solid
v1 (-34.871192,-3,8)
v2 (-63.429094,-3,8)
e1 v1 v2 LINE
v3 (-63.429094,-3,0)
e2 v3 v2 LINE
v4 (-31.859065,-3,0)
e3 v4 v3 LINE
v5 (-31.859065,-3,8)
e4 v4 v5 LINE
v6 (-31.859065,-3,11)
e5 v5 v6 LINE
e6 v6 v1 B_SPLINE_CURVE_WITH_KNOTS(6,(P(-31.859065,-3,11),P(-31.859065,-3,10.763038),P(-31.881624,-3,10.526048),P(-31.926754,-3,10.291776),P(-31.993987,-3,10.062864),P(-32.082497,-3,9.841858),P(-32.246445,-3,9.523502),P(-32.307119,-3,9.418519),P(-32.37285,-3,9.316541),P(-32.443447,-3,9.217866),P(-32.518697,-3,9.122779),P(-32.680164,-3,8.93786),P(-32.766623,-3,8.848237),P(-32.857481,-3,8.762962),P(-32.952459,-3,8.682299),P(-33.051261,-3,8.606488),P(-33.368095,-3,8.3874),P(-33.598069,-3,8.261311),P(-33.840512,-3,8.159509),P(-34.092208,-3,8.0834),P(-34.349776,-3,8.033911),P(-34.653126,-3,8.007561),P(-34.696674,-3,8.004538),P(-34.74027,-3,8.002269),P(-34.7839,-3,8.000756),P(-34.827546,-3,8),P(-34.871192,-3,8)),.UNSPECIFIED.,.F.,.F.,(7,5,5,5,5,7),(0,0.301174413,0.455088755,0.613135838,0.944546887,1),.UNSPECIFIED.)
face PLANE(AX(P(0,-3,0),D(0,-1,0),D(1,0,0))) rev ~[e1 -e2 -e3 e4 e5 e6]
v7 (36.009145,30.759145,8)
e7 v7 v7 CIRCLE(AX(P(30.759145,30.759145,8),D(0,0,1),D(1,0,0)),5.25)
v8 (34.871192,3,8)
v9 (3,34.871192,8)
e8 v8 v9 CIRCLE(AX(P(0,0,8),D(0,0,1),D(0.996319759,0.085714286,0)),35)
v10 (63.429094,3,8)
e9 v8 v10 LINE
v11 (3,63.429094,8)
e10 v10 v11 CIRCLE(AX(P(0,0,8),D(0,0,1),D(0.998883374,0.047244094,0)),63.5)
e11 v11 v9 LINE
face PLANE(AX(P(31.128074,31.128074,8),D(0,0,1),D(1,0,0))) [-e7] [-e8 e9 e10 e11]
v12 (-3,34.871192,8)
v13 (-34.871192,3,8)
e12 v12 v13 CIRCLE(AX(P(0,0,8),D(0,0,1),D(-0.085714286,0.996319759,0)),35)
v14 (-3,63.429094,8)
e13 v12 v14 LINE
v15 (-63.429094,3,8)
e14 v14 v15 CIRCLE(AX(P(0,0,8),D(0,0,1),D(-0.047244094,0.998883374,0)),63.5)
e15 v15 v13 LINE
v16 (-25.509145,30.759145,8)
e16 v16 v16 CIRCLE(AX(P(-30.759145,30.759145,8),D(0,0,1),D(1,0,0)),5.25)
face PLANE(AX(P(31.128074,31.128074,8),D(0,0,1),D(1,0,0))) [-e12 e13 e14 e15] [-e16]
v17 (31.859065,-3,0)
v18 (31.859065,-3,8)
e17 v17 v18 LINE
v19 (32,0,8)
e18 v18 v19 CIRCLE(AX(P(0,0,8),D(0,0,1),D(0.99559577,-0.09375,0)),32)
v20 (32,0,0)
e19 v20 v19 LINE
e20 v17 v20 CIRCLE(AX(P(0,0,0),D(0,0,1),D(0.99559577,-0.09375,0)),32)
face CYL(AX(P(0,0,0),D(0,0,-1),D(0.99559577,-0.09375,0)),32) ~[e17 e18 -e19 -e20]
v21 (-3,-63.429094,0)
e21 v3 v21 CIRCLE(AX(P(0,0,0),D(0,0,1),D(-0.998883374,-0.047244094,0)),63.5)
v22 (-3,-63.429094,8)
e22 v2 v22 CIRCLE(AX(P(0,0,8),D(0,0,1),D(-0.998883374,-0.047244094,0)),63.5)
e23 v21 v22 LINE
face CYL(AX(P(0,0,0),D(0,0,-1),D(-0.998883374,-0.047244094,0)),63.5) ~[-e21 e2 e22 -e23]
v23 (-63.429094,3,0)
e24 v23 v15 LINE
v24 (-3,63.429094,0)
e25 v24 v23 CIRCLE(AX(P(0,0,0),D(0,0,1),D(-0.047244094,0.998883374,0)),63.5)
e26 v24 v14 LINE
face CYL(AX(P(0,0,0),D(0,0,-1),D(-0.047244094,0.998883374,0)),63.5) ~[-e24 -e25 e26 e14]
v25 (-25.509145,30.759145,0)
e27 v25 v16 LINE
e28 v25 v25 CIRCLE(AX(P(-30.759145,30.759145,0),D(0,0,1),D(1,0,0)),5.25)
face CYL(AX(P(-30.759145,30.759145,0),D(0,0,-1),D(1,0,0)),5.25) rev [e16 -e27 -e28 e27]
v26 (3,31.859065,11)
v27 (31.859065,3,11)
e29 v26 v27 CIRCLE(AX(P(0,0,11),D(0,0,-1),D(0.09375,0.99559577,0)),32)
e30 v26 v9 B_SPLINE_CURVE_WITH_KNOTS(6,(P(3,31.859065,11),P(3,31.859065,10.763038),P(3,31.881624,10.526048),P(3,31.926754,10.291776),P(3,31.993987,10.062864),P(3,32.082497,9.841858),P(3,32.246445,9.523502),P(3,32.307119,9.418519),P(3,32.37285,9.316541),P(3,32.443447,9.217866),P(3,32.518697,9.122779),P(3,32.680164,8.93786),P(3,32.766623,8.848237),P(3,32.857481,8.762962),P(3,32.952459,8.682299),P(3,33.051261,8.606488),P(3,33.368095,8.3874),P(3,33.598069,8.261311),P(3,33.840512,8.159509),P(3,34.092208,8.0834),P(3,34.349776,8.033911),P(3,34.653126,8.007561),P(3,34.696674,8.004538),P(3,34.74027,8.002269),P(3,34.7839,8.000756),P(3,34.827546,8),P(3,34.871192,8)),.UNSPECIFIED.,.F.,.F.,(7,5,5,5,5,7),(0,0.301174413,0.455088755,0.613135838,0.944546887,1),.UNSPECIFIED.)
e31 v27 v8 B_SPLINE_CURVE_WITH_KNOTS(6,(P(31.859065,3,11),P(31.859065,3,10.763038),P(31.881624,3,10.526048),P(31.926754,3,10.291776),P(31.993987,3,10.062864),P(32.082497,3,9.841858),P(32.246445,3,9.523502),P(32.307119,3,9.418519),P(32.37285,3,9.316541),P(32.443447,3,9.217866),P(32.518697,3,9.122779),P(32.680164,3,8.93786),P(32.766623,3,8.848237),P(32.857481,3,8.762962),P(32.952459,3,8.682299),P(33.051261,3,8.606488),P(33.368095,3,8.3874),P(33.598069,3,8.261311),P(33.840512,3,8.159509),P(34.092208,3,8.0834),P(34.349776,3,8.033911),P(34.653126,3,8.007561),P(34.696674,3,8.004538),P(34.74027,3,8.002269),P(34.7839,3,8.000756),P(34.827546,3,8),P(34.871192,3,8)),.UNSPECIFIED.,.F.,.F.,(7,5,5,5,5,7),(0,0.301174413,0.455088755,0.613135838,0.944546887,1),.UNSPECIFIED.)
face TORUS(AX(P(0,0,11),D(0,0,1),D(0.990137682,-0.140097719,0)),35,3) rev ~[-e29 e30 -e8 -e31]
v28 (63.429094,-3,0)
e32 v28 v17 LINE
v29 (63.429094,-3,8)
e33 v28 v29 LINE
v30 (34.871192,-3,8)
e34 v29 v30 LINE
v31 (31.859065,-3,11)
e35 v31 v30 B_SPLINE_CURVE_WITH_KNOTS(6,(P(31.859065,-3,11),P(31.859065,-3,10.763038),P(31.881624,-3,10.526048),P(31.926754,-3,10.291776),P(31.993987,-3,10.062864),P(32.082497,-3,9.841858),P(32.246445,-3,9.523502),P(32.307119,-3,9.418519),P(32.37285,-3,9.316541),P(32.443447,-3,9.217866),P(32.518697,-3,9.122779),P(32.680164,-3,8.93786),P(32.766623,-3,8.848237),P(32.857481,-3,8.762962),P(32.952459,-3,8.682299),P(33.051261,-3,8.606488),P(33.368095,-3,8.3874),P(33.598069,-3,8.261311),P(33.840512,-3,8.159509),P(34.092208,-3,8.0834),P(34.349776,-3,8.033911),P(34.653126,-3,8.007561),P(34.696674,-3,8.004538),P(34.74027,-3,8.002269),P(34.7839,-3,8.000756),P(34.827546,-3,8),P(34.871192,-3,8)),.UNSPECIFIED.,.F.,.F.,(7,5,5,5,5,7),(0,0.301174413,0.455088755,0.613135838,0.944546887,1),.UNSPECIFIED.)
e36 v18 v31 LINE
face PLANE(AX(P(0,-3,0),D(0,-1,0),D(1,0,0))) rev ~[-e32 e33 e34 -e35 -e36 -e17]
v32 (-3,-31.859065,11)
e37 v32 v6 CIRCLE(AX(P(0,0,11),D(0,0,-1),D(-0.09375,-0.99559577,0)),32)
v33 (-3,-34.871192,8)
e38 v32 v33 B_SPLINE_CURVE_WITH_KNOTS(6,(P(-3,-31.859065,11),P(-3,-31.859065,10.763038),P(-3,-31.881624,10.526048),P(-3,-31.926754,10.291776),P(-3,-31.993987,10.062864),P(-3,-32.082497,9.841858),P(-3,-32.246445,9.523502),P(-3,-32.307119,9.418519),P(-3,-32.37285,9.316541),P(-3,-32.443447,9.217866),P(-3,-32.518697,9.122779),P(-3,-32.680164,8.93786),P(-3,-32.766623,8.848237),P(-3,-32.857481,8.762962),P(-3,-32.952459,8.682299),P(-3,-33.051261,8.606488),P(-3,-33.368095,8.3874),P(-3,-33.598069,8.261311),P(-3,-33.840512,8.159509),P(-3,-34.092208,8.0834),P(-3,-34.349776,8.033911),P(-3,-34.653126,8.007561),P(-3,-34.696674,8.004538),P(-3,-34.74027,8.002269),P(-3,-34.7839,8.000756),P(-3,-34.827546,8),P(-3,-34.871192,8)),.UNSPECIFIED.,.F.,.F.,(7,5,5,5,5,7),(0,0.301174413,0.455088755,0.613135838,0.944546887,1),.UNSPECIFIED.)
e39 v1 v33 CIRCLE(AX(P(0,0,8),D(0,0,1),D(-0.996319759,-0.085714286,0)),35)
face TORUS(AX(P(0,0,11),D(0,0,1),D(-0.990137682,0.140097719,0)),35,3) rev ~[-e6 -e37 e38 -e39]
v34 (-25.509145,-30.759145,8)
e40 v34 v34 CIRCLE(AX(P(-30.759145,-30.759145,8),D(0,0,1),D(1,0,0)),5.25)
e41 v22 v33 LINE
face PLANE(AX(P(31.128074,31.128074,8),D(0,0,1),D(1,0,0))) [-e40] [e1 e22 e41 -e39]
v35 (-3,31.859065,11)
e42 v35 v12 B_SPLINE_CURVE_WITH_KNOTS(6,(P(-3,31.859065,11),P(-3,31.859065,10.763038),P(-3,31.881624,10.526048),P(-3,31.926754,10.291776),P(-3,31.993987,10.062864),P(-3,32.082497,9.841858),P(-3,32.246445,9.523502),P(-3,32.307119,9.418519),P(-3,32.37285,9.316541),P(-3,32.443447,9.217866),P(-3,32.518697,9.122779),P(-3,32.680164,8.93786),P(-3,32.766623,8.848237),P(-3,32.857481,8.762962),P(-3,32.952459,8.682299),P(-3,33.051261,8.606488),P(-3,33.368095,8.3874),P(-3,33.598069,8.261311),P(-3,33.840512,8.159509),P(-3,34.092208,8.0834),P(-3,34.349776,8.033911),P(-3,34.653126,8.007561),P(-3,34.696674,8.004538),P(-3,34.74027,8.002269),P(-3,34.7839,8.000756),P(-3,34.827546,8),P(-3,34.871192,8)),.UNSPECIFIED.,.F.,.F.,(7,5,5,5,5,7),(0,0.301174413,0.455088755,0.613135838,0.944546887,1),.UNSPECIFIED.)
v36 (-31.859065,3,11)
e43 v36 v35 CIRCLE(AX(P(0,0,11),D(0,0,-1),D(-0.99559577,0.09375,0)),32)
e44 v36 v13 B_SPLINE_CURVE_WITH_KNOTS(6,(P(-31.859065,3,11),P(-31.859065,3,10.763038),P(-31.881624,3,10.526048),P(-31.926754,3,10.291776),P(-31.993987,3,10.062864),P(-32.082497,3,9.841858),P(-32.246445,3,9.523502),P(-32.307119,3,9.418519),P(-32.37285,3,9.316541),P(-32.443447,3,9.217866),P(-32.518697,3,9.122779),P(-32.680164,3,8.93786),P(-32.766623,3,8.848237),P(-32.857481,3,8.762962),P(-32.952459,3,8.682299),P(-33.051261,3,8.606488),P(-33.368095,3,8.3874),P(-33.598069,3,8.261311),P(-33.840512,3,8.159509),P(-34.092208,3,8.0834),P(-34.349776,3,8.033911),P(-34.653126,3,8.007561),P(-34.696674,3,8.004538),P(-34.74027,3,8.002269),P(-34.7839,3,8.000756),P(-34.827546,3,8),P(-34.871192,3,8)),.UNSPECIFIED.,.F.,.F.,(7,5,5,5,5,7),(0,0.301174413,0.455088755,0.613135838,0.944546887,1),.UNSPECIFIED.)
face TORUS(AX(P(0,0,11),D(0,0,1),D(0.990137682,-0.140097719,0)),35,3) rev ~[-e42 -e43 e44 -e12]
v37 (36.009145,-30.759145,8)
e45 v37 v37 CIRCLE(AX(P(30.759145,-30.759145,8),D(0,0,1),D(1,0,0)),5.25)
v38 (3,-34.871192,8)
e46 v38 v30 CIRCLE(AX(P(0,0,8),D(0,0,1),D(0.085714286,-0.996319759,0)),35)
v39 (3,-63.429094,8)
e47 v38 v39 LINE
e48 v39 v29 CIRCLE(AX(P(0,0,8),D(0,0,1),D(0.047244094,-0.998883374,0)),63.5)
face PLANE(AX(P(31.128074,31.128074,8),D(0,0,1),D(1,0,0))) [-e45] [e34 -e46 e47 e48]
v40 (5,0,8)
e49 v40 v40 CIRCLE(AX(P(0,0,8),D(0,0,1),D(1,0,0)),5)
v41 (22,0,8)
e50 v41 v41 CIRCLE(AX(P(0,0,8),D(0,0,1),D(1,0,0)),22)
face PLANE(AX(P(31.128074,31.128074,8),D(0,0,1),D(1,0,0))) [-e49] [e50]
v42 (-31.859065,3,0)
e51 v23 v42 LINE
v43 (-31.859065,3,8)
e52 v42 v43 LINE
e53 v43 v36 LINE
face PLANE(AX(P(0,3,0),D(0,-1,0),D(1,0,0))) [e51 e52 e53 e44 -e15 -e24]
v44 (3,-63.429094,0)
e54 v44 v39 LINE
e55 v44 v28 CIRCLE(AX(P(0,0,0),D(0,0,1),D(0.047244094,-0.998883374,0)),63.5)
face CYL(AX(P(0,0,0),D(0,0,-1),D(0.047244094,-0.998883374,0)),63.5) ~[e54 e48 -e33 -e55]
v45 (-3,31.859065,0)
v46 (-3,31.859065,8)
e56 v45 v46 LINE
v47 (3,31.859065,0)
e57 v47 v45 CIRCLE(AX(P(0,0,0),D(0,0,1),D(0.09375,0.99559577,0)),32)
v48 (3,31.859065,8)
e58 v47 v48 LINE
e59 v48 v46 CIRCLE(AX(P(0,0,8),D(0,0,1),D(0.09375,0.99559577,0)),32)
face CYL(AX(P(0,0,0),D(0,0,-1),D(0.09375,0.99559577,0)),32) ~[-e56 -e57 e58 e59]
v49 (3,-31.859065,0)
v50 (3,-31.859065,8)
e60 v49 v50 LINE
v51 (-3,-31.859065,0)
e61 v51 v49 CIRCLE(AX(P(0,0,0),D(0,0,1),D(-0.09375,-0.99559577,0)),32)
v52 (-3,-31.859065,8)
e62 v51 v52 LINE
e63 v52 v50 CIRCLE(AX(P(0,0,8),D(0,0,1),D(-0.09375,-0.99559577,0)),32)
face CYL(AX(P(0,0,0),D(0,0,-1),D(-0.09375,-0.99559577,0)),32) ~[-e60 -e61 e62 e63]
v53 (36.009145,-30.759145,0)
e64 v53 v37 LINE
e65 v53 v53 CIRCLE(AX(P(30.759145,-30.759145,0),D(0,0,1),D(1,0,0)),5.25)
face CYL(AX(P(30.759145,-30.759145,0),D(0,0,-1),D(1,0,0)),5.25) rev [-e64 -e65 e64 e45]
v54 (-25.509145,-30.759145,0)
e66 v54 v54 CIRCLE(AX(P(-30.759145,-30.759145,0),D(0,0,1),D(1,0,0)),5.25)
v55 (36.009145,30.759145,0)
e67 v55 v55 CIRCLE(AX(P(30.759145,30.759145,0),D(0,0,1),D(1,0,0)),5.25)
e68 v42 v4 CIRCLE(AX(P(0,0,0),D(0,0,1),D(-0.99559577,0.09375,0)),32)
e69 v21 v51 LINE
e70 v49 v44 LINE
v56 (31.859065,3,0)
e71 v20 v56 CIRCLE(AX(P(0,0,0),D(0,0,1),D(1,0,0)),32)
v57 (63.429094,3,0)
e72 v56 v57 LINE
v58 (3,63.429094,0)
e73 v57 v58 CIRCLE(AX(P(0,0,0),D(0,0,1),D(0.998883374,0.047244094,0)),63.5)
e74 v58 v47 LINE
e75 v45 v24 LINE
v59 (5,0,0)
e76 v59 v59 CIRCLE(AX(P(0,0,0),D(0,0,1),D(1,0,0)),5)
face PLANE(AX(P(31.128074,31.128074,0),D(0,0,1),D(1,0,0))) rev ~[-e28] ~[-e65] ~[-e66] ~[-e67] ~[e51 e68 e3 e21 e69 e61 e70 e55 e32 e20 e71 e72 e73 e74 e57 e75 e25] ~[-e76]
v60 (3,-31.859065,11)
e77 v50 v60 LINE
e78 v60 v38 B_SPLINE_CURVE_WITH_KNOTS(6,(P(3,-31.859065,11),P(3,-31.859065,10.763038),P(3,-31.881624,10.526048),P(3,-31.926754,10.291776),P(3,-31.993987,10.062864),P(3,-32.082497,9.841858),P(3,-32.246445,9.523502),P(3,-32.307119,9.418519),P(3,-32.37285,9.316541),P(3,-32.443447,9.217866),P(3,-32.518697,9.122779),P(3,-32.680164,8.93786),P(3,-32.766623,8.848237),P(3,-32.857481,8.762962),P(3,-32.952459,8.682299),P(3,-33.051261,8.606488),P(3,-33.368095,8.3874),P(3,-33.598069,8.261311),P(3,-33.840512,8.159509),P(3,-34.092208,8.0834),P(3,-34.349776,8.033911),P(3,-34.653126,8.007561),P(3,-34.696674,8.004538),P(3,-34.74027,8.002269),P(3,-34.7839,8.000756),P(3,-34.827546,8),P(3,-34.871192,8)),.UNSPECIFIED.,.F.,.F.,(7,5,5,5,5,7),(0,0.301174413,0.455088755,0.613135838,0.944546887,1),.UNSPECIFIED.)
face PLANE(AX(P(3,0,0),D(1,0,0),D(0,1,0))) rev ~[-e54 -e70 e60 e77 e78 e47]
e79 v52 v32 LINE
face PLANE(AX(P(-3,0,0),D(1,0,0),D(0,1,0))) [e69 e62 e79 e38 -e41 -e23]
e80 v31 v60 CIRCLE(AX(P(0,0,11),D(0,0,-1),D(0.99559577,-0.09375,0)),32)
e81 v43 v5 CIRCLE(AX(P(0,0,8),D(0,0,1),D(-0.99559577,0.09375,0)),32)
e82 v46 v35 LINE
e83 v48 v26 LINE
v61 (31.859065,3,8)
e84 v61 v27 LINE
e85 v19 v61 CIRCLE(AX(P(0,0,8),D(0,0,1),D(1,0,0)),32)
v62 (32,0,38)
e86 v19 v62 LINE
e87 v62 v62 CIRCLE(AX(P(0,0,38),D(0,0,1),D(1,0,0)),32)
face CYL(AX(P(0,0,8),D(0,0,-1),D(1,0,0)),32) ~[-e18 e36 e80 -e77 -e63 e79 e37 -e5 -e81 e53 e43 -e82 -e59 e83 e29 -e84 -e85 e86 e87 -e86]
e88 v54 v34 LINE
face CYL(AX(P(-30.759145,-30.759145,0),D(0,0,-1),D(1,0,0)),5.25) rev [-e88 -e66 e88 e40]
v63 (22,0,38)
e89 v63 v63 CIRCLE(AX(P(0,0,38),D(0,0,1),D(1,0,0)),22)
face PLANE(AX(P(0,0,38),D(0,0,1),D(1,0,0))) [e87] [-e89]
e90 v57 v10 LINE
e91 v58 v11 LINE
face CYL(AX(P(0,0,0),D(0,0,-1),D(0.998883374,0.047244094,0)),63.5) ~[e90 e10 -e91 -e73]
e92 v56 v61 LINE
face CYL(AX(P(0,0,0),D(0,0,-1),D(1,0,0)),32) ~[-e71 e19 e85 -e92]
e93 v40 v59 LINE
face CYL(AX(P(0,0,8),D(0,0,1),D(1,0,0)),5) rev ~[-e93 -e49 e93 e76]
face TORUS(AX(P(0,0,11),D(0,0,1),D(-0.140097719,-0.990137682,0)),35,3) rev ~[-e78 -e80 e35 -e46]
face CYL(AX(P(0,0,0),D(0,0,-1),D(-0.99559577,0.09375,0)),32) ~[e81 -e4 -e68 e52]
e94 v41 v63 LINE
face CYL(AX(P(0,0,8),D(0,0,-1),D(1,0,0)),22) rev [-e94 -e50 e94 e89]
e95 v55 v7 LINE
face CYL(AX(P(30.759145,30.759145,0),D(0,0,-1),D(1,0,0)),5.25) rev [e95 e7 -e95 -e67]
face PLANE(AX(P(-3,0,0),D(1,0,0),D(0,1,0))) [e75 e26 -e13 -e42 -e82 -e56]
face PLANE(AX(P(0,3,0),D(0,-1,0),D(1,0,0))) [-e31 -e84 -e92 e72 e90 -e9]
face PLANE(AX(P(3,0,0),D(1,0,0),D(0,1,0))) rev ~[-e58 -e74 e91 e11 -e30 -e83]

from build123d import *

# Parameters (mm, degrees)
F0_R         = 5.25
F1_DEPTH     = 8
F2_R         = 32
F2_R_2       = 22
F3_DEPTH     = 30
F4_T4_ANGLE  = 106.1070017135
F4_T9_ANGLE  = 106.1070017135
F4_T15_ANGLE = 106.1070017135
F4_T20_ANGLE = 106.1070017135
F4_T25_ANGLE = 106.1070017135
F4_T31_ANGLE = 106.1070017135
F4_T36_ANGLE = 106.1070017135
F4_T41_ANGLE = 106.1070017135
F4_T47_ANGLE = 106.1070017135
F4_T52_ANGLE = 106.1070017135
F4_T57_ANGLE = 106.1070017135
F4_T63_ANGLE = 106.1070017135
F5_R         = 5
F6_DEPTH     = 19.3


# Not quite as in the source:
# - a fillet or chamfer that OpenCascade refuses, or shapes differently, is made with other operations: its cross-section is extruded or revolved along the edge and cut away or added


with BuildPart() as f1:
    # F0 (on Top) → F1 (new body)
    with BuildSketch(Plane.XY):
        with BuildLine():
            ThreePointArc((3, 31.8590646441), (22.627416998, 22.627416998), (31.8590646441, 3))
            Line((31.8590646441, 3), (63.4290942707, 3))
            ThreePointArc((63.4290942707, 3), (44.9012806053, 44.9012806053), (3, 63.4290942707))
            Line((3, 63.4290942707), (3, 31.8590646441))
        make_face()
        with Locations((30.7591449816, 30.7591449816)):
            Circle(F0_R, mode=Mode.SUBTRACT)
        with BuildLine():
            ThreePointArc((-31.8590646441, 3), (-22.627416998, 22.627416998), (-3, 31.8590646441))
            Line((-3, 31.8590646441), (-3, 63.4290942707))
            ThreePointArc((-3, 63.4290942707), (-44.9012806053, 44.9012806053), (-63.4290942707, 3))
            Line((-63.4290942707, 3), (-31.8590646441, 3))
        make_face()
        with Locations((-30.7591449816, 30.7591449816)):
            Circle(F0_R, mode=Mode.SUBTRACT)
        with BuildLine():
            Line((-3, -63.4290942707), (-3, -31.8590646441))
            ThreePointArc((-3, -31.8590646441), (-22.627416998, -22.627416998), (-31.8590646441, -3))
            Line((-31.8590646441, -3), (-63.4290942707, -3))
            ThreePointArc((-63.4290942707, -3), (-44.9012806053, -44.9012806053), (-3, -63.4290942707))
        make_face()
        with Locations((-30.7591449816, -30.7591449816)):
            Circle(F0_R, mode=Mode.SUBTRACT)
        with BuildLine():
            Line((63.4290942707, -3), (31.8590646441, -3))
            ThreePointArc((31.8590646441, -3), (22.627416998, -22.627416998), (3, -31.8590646441))
            Line((3, -31.8590646441), (3, -63.4290942707))
            ThreePointArc((3, -63.4290942707), (44.9012806053, -44.9012806053), (63.4290942707, -3))
        make_face()
        with Locations((30.7591449816, -30.7591449816)):
            Circle(F0_R, mode=Mode.SUBTRACT)
        with BuildLine():
            ThreePointArc((31.8590646441, -3), (31.9647467424, -1.501654319), (32, 0))
            ThreePointArc((32, 0), (31.9647467424, 1.501654319), (31.8590646441, 3))
            ThreePointArc((31.8590646441, 3), (22.627416998, 22.627416998), (3, 31.8590646441))
            ThreePointArc((3, 31.8590646441), (0, 32), (-3, 31.8590646441))
            ThreePointArc((-3, 31.8590646441), (-22.627416998, 22.627416998), (-31.8590646441, 3))
            ThreePointArc((-31.8590646441, 3), (-32, 0), (-31.8590646441, -3))
            ThreePointArc((-31.8590646441, -3), (-22.627416998, -22.627416998), (-3, -31.8590646441))
            ThreePointArc((-3, -31.8590646441), (0, -32), (3, -31.8590646441))
            ThreePointArc((3, -31.8590646441), (22.627416998, -22.627416998), (31.8590646441, -3))
        make_face()
    extrude(amount=F1_DEPTH)

    # F2 (on face) → F3 (join)
    with BuildSketch(Plane.XY.offset(8)):
        Circle(F2_R)
        Circle(F2_R_2, mode=Mode.SUBTRACT)
    extrude(amount=F3_DEPTH)

    # F4: fillet of radius 3 on 6 edges, made by hand


with BuildPart() as f4_tool2:
    # F4_s3 → F4_t4 (revolve)
    with BuildSketch(Plane(origin=(0, 0, 0), x_dir=(0, 0, 1), z_dir=(-0.1400977189, -0.9901376819, 0))):
        with BuildLine():
            ThreePointArc((11, -32), (8.8786796564, -32.8786796564), (8, -35))
            Line((8, -35), (8, -32))
            Line((8, -32), (11, -32))
        make_face()
    revolve(axis=Axis((0, 0, 8), (0, 0, 1)), revolution_arc=F4_T4_ANGLE)

    split(bisect_by=Plane.XZ.offset(3), keep=Keep.TOP)


with BuildPart() as f1_1:
    add(f1.part)

    # F4_t1: union F4_tool2
    add(f4_tool2.part)


with BuildPart() as f4_tool7:
    # F4_s8 → F4_t9 (revolve)
    with BuildSketch(Plane(origin=(0, 0, 0), x_dir=(0, 0, 1), z_dir=(-0.1400977189, -0.9901376819, 0))):
        with BuildLine():
            ThreePointArc((11, -32), (8.8786796564, -32.8786796564), (8, -35))
            Line((8, -35), (8, -32))
            Line((8, -32), (11, -32))
        make_face()
    revolve(axis=Axis((0, 0, 8), (0, 0, 1)), revolution_arc=F4_T9_ANGLE)

    split(bisect_by=Plane.YZ.offset(3), keep=Keep.TOP)

    split(bisect_by=Plane.XZ.offset(-3), keep=Keep.BOTTOM)


with BuildPart() as f1_2:
    add(f1_1.part)

    # F4_t6: union F4_tool7
    add(f4_tool7.part)


with BuildPart() as f4_tool13:
    # F4_s14 → F4_t15 (revolve)
    with BuildSketch(Plane(origin=(0, 0, 0), x_dir=(0, 0, 1), z_dir=(-0.1400977189, -0.9901376819, 0))):
        with BuildLine():
            ThreePointArc((11, -32), (8.8786796564, -32.8786796564), (8, -35))
            Line((8, -35), (8, -32))
            Line((8, -32), (11, -32))
        make_face()
    revolve(axis=Axis((0, 0, 8), (0, 0, 1)), revolution_arc=F4_T15_ANGLE)

    split(bisect_by=Plane.YZ.offset(-3), keep=Keep.BOTTOM)


with BuildPart() as f1_3:
    add(f1_2.part)

    # F4_t12: union F4_tool13
    add(f4_tool13.part)


with BuildPart() as f4_tool18:
    # F4_s19 → F4_t20 (revolve)
    with BuildSketch(Plane(origin=(0, 0, 0), x_dir=(0, 0, 1), z_dir=(-0.9901376819, 0.1400977189, 0))):
        with BuildLine():
            ThreePointArc((11, -32), (8.8786796564, -32.8786796564), (8, -35))
            Line((8, -35), (8, -32))
            Line((8, -32), (11, -32))
        make_face()
    revolve(axis=Axis((0, 0, 8), (0, 0, 1)), revolution_arc=F4_T20_ANGLE)

    split(bisect_by=Plane.YZ.offset(-3), keep=Keep.BOTTOM)


with BuildPart() as f1_4:
    add(f1_3.part)

    # F4_t17: union F4_tool18
    add(f4_tool18.part)


with BuildPart() as f4_tool23:
    # F4_s24 → F4_t25 (revolve)
    with BuildSketch(Plane(origin=(0, 0, 0), x_dir=(0, 0, 1), z_dir=(-0.9901376819, 0.1400977189, 0))):
        with BuildLine():
            ThreePointArc((11, -32), (8.8786796564, -32.8786796564), (8, -35))
            Line((8, -35), (8, -32))
            Line((8, -32), (11, -32))
        make_face()
    revolve(axis=Axis((0, 0, 8), (0, 0, 1)), revolution_arc=F4_T25_ANGLE)

    split(bisect_by=Plane.XZ.offset(3), keep=Keep.TOP)

    split(bisect_by=Plane.YZ.offset(3), keep=Keep.TOP)


with BuildPart() as f1_5:
    add(f1_4.part)

    # F4_t22: union F4_tool23
    add(f4_tool23.part)


with BuildPart() as f4_tool29:
    # F4_s30 → F4_t31 (revolve)
    with BuildSketch(Plane(origin=(0, 0, 0), x_dir=(0, 0, 1), z_dir=(-0.9901376819, 0.1400977189, 0))):
        with BuildLine():
            ThreePointArc((11, -32), (8.8786796564, -32.8786796564), (8, -35))
            Line((8, -35), (8, -32))
            Line((8, -32), (11, -32))
        make_face()
    revolve(axis=Axis((0, 0, 8), (0, 0, 1)), revolution_arc=F4_T31_ANGLE)

    split(bisect_by=Plane.XZ.offset(-3), keep=Keep.BOTTOM)


with BuildPart() as f1_6:
    add(f1_5.part)

    # F4_t28: union F4_tool29
    add(f4_tool29.part)


with BuildPart() as f4_tool34:
    # F4_s35 → F4_t36 (revolve)
    with BuildSketch(Plane(origin=(0, 0, 0), x_dir=(0, 0, 1), z_dir=(0.1400977189, 0.9901376819, 0))):
        with BuildLine():
            ThreePointArc((11, -32), (8.8786796564, -32.8786796564), (8, -35))
            Line((8, -35), (8, -32))
            Line((8, -32), (11, -32))
        make_face()
    revolve(axis=Axis((0, 0, 8), (0, 0, 1)), revolution_arc=F4_T36_ANGLE)

    split(bisect_by=Plane.XZ.offset(-3), keep=Keep.BOTTOM)


with BuildPart() as f1_7:
    add(f1_6.part)

    # F4_t33: union F4_tool34
    add(f4_tool34.part)


with BuildPart() as f4_tool39:
    # F4_s40 → F4_t41 (revolve)
    with BuildSketch(Plane(origin=(0, 0, 0), x_dir=(0, 0, 1), z_dir=(0.1400977189, 0.9901376819, 0))):
        with BuildLine():
            ThreePointArc((11, -32), (8.8786796564, -32.8786796564), (8, -35))
            Line((8, -35), (8, -32))
            Line((8, -32), (11, -32))
        make_face()
    revolve(axis=Axis((0, 0, 8), (0, 0, 1)), revolution_arc=F4_T41_ANGLE)

    split(bisect_by=Plane.XZ.offset(3), keep=Keep.TOP)

    split(bisect_by=Plane.YZ.offset(-3), keep=Keep.BOTTOM)


with BuildPart() as f1_8:
    add(f1_7.part)

    # F4_t38: union F4_tool39
    add(f4_tool39.part)


with BuildPart() as f4_tool45:
    # F4_s46 → F4_t47 (revolve)
    with BuildSketch(Plane(origin=(0, 0, 0), x_dir=(0, 0, 1), z_dir=(0.1400977189, 0.9901376819, 0))):
        with BuildLine():
            ThreePointArc((11, -32), (8.8786796564, -32.8786796564), (8, -35))
            Line((8, -35), (8, -32))
            Line((8, -32), (11, -32))
        make_face()
    revolve(axis=Axis((0, 0, 8), (0, 0, 1)), revolution_arc=F4_T47_ANGLE)

    split(bisect_by=Plane.YZ.offset(3), keep=Keep.TOP)


with BuildPart() as f1_9:
    add(f1_8.part)

    # F4_t44: union F4_tool45
    add(f4_tool45.part)


with BuildPart() as f4_tool50:
    # F4_s51 → F4_t52 (revolve)
    with BuildSketch(Plane(origin=(0, 0, 0), x_dir=(0, 0, 1), z_dir=(0.9901376819, -0.1400977189, 0))):
        with BuildLine():
            ThreePointArc((11, -32), (8.8786796564, -32.8786796564), (8, -35))
            Line((8, -35), (8, -32))
            Line((8, -32), (11, -32))
        make_face()
    revolve(axis=Axis((0, 0, 8), (0, 0, 1)), revolution_arc=F4_T52_ANGLE)

    split(bisect_by=Plane.YZ.offset(3), keep=Keep.TOP)


with BuildPart() as f1_10:
    add(f1_9.part)

    # F4_t49: union F4_tool50
    add(f4_tool50.part)


with BuildPart() as f4_tool55:
    # F4_s56 → F4_t57 (revolve)
    with BuildSketch(Plane(origin=(0, 0, 0), x_dir=(0, 0, 1), z_dir=(0.9901376819, -0.1400977189, 0))):
        with BuildLine():
            ThreePointArc((11, -32), (8.8786796564, -32.8786796564), (8, -35))
            Line((8, -35), (8, -32))
            Line((8, -32), (11, -32))
        make_face()
    revolve(axis=Axis((0, 0, 8), (0, 0, 1)), revolution_arc=F4_T57_ANGLE)

    split(bisect_by=Plane.XZ.offset(-3), keep=Keep.BOTTOM)

    split(bisect_by=Plane.YZ.offset(-3), keep=Keep.BOTTOM)


with BuildPart() as f1_11:
    add(f1_10.part)

    # F4_t54: union F4_tool55
    add(f4_tool55.part)


with BuildPart() as f4_tool61:
    # F4_s62 → F4_t63 (revolve)
    with BuildSketch(Plane(origin=(0, 0, 0), x_dir=(0, 0, 1), z_dir=(0.9901376819, -0.1400977189, 0))):
        with BuildLine():
            ThreePointArc((11, -32), (8.8786796564, -32.8786796564), (8, -35))
            Line((8, -35), (8, -32))
            Line((8, -32), (11, -32))
        make_face()
    revolve(axis=Axis((0, 0, 8), (0, 0, 1)), revolution_arc=F4_T63_ANGLE)

    split(bisect_by=Plane.XZ.offset(3), keep=Keep.TOP)


with BuildPart() as f1_12:
    add(f1_11.part)

    # F4_t60: union F4_tool61
    add(f4_tool61.part)

    # F5 (on face) → F6 (cut)
    with BuildSketch(Plane.XY.offset(8)):
        Circle(F5_R)
    extrude(amount=-F6_DEPTH, mode=Mode.SUBTRACT)


solid = f1_12.part
